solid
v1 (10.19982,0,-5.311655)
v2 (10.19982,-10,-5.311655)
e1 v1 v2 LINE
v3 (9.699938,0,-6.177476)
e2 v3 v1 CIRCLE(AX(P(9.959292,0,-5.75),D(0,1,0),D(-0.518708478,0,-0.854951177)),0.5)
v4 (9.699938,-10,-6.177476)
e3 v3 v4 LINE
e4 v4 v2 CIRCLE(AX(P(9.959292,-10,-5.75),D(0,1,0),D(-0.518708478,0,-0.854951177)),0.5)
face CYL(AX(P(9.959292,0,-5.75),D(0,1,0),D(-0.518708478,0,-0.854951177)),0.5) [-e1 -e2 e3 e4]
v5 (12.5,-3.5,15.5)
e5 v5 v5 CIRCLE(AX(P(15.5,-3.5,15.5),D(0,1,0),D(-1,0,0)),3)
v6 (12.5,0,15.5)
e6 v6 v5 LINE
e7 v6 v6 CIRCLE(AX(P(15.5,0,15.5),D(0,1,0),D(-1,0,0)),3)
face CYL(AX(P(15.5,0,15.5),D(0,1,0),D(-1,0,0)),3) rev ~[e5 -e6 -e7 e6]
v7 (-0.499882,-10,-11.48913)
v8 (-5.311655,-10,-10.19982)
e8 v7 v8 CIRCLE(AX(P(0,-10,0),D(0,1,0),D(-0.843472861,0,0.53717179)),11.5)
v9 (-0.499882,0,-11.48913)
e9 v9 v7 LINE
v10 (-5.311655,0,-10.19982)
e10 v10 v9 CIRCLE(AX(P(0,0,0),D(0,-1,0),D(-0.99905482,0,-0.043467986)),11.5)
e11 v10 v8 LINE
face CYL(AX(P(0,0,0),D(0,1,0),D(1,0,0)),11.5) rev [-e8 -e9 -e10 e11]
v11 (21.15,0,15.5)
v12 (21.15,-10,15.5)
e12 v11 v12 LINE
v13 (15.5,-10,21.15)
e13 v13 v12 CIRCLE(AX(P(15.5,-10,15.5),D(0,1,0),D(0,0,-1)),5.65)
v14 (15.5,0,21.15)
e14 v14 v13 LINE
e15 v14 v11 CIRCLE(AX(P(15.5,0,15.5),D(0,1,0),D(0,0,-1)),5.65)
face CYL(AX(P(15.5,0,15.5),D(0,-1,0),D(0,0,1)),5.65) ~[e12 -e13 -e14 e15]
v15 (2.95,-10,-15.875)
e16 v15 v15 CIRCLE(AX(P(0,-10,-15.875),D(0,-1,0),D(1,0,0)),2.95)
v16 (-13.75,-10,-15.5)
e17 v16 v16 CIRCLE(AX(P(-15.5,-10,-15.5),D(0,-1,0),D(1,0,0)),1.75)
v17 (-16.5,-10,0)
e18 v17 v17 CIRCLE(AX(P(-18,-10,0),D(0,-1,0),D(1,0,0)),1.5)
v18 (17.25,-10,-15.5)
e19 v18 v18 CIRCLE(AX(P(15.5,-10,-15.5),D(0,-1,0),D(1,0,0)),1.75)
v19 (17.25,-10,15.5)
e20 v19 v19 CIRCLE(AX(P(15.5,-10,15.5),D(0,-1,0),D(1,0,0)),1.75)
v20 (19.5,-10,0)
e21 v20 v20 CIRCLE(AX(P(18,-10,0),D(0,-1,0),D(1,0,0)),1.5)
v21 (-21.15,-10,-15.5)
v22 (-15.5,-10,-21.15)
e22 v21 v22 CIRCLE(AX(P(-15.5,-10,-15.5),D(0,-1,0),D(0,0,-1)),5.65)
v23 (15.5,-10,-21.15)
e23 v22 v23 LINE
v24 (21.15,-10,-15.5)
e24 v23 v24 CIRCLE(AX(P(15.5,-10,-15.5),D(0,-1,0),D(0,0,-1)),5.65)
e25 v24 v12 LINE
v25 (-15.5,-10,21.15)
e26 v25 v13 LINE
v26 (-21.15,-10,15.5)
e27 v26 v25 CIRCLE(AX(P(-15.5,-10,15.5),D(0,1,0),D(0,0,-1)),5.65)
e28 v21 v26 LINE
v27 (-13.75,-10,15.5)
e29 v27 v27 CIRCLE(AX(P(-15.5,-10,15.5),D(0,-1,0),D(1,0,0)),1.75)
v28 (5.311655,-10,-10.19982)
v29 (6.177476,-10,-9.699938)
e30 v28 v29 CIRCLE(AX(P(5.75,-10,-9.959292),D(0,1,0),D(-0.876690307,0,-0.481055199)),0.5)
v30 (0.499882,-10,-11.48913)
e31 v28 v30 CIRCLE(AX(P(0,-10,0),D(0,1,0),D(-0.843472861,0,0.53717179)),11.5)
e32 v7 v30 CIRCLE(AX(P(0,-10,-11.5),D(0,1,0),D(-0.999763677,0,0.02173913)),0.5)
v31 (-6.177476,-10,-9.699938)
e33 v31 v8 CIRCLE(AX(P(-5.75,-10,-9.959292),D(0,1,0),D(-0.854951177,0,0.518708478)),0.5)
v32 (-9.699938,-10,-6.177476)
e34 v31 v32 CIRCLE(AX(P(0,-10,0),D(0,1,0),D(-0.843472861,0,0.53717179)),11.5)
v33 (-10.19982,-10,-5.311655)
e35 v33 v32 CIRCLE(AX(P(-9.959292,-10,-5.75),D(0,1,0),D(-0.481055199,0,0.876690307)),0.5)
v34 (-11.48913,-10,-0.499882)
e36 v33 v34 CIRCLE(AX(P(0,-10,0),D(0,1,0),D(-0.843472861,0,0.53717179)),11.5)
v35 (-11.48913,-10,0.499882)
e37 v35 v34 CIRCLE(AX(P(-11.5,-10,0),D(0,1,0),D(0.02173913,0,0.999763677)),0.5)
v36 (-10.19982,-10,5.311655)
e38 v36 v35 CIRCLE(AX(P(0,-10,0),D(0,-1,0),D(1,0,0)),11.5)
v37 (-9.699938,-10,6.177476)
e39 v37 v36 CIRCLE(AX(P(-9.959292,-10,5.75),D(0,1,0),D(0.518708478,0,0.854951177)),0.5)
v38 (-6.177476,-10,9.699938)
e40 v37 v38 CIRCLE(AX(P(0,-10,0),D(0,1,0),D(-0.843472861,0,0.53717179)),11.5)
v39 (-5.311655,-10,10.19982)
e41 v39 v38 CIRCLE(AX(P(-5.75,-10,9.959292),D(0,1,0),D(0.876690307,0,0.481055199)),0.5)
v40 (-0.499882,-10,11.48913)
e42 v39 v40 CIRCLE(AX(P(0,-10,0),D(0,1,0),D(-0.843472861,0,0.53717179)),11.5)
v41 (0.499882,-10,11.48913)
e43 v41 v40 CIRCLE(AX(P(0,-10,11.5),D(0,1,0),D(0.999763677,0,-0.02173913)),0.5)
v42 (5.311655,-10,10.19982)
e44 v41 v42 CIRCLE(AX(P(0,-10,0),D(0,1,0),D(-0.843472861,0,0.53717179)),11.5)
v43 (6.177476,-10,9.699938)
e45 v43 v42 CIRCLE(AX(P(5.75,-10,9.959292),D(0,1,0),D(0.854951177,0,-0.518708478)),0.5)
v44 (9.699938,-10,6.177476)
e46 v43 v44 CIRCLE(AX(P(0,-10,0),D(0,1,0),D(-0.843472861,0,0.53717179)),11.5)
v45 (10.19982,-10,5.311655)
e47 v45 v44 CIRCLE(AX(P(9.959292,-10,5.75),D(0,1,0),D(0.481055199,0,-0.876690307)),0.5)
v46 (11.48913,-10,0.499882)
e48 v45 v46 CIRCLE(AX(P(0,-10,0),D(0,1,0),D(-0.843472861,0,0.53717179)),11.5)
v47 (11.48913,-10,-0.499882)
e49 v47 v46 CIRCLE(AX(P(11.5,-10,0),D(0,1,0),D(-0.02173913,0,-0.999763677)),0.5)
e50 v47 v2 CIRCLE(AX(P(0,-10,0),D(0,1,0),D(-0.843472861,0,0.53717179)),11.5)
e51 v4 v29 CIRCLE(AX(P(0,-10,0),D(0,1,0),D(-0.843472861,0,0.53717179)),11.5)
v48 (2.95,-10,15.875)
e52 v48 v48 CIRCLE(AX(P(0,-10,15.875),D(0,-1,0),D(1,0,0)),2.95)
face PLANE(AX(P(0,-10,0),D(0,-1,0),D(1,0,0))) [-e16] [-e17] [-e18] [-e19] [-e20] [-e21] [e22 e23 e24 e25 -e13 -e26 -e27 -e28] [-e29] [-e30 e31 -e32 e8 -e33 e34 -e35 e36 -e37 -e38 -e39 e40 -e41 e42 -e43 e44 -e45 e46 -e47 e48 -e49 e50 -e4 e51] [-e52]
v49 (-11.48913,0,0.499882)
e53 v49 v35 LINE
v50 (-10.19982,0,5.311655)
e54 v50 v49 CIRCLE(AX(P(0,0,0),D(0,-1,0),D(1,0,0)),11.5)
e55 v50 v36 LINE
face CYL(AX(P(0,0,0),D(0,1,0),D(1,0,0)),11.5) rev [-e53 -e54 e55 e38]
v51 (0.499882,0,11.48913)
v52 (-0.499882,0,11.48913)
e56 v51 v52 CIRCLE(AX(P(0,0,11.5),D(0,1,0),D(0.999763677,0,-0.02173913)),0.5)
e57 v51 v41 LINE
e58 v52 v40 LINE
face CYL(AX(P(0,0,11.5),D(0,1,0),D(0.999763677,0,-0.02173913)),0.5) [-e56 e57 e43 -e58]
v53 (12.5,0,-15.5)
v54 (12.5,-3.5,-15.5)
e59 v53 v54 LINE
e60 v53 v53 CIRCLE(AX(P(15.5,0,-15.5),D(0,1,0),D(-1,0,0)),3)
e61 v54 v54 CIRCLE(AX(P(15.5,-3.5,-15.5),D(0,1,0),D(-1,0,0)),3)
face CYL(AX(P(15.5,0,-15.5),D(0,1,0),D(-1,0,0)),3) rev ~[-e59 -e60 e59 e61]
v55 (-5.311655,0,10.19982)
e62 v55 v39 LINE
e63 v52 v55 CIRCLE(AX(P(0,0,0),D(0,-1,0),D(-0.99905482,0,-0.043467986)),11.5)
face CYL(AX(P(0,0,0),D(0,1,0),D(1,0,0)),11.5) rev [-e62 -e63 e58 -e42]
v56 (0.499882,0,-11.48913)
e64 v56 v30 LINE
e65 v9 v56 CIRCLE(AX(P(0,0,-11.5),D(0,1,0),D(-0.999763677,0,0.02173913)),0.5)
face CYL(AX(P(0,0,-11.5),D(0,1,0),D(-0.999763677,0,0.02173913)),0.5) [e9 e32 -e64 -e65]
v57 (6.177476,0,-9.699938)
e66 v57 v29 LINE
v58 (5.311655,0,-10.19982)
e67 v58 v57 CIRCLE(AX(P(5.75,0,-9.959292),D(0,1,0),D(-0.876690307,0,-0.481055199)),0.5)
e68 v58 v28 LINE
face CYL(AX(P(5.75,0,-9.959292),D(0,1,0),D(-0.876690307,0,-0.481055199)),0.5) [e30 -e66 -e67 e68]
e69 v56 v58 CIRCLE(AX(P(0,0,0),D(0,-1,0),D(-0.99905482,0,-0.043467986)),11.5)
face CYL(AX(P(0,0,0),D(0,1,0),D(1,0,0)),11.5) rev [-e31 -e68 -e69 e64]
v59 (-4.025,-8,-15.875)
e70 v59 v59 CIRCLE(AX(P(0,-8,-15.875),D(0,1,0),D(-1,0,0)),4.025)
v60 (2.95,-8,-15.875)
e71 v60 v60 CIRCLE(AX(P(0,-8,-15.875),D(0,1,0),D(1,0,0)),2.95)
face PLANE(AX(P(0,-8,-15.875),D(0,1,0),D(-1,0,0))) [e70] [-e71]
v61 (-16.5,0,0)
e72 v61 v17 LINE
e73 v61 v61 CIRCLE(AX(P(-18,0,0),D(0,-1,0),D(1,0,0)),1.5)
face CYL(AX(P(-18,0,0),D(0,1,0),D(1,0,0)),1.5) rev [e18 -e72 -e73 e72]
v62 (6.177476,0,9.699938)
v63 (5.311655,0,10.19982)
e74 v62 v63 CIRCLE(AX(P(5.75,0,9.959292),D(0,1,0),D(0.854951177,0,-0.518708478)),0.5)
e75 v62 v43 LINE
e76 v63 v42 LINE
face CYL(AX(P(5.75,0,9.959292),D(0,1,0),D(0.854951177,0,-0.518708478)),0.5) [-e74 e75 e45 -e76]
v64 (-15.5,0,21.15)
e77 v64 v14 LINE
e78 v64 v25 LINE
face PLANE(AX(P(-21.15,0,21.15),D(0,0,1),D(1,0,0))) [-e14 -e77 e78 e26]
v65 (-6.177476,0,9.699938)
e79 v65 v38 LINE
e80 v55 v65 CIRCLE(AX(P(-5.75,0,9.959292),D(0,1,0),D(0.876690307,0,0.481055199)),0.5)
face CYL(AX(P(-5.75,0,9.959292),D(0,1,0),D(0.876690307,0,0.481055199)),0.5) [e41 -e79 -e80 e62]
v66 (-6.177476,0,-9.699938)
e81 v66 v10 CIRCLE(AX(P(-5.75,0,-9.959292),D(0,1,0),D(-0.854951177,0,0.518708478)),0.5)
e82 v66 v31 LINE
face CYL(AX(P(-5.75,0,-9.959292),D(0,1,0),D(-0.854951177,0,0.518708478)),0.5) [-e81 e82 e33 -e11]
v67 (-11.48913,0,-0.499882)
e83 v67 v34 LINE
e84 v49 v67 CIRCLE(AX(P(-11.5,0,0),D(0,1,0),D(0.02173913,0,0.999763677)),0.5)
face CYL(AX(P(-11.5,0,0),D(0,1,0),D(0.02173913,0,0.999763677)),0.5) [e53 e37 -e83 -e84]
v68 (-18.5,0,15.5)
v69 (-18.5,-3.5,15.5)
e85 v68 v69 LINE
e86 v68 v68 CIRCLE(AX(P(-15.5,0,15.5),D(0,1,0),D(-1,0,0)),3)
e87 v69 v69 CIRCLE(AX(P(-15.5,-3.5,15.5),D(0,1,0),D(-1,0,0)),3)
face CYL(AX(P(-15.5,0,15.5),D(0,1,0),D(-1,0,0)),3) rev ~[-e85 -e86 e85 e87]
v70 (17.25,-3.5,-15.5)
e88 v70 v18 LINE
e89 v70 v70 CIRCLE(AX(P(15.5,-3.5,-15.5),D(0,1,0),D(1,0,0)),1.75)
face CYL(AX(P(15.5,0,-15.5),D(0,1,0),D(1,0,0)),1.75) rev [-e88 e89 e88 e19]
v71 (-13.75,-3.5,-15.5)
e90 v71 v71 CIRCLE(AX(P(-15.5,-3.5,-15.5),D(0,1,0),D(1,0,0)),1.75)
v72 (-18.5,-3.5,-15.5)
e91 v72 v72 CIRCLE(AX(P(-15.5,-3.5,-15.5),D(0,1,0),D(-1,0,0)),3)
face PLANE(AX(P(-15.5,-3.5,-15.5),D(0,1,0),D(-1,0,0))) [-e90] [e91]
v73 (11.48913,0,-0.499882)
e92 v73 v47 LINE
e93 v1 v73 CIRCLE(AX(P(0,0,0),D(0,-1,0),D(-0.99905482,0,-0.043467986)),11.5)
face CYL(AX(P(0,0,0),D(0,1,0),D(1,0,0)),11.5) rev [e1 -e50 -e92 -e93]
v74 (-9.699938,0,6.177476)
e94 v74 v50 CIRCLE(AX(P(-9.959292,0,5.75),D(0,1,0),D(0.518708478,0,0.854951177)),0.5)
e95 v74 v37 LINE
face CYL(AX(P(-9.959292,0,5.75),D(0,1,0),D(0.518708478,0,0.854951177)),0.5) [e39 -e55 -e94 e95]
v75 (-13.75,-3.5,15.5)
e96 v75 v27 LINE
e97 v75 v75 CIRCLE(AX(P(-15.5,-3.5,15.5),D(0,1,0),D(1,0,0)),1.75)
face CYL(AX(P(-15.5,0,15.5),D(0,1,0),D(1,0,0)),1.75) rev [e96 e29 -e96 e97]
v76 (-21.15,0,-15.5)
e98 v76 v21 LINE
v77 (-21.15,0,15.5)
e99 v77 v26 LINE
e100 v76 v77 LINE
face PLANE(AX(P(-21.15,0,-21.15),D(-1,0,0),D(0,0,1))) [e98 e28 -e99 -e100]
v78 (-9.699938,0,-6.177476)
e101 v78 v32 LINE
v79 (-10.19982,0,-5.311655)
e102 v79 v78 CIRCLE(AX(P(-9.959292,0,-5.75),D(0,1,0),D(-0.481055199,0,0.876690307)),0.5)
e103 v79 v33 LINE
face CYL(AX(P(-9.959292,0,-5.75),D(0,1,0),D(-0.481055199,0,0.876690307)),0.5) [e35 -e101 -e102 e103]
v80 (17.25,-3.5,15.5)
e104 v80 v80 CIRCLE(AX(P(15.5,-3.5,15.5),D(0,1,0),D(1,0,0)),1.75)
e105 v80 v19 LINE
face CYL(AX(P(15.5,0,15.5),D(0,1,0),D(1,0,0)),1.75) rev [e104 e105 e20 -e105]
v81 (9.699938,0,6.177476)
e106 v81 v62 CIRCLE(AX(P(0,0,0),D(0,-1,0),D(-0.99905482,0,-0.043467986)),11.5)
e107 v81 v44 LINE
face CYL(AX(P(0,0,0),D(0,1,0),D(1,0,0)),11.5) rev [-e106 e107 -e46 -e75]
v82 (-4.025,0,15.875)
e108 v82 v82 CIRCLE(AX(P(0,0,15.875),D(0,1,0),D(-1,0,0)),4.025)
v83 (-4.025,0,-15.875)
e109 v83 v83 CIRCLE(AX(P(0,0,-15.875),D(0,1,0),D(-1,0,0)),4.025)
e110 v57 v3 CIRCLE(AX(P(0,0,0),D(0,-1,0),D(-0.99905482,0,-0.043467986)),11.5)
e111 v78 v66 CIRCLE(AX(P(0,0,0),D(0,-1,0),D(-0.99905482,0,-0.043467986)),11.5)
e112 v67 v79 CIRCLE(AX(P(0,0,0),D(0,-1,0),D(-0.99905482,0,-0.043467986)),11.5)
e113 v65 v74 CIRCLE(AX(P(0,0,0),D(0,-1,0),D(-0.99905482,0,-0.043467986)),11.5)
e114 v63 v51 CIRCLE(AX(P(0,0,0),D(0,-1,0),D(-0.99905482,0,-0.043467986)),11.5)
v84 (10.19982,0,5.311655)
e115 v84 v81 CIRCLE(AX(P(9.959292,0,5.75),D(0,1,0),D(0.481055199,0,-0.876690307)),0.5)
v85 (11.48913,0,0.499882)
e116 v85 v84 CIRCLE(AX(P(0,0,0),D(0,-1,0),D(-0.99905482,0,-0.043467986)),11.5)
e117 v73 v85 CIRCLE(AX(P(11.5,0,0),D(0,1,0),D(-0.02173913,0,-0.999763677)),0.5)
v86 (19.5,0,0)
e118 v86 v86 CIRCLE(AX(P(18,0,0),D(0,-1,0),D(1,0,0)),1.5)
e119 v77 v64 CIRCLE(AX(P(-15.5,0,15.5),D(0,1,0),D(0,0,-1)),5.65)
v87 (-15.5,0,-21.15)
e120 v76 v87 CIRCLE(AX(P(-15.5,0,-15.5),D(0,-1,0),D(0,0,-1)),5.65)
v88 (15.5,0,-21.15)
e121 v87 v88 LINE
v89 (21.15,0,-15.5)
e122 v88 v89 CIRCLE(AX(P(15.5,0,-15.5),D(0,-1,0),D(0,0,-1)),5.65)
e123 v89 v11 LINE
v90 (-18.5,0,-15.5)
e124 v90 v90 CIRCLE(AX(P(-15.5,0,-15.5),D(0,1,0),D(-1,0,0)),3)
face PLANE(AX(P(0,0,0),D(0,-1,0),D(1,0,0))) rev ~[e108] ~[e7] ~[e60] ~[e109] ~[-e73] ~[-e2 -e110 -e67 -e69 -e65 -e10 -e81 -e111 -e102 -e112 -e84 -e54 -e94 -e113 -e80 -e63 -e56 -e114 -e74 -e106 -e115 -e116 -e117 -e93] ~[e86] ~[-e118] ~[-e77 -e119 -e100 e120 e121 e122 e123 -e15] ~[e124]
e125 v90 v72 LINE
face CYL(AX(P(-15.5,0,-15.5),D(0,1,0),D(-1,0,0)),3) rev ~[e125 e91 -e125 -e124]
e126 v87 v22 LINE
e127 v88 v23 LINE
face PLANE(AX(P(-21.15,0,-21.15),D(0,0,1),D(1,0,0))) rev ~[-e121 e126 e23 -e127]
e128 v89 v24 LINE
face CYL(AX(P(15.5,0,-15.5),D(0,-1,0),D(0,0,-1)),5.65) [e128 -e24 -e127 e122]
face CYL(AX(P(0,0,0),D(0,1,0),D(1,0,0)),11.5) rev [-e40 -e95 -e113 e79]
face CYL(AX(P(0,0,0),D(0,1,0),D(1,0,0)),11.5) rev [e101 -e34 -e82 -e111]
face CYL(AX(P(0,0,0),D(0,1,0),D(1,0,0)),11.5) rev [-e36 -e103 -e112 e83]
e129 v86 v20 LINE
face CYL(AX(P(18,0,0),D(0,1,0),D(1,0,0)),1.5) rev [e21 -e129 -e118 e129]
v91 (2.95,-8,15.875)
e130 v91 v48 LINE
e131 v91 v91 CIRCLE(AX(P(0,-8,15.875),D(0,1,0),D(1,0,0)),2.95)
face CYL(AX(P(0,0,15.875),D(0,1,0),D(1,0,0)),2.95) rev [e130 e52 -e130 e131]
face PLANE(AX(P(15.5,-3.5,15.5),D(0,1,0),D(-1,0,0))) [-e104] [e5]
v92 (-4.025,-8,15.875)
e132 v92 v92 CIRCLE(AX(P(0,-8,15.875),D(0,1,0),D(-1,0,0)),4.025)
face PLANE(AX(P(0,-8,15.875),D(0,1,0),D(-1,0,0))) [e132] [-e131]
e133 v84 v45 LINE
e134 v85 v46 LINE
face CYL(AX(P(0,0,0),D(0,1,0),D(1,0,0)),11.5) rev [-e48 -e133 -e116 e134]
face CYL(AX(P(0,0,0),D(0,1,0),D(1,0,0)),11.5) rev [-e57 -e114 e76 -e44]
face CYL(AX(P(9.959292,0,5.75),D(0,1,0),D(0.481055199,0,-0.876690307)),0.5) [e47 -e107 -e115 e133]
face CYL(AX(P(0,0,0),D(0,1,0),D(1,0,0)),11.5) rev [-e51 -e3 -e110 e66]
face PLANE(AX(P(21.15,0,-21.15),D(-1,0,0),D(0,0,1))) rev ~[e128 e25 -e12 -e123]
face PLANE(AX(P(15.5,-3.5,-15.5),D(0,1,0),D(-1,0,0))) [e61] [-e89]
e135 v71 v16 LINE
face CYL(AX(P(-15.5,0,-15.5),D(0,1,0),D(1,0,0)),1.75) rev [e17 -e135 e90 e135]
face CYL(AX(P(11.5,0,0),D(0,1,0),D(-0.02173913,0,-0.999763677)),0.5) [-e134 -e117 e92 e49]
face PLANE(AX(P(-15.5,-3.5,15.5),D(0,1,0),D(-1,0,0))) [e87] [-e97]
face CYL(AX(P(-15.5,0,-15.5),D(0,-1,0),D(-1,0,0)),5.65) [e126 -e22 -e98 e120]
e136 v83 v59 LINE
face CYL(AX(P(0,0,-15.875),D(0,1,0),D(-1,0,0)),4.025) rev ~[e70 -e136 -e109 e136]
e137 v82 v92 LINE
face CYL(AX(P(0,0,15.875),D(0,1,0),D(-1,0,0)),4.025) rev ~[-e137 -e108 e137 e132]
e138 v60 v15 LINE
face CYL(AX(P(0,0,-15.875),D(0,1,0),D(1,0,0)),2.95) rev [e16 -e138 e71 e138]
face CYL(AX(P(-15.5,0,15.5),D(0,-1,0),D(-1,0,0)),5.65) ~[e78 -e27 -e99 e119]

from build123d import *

# Parameters (mm, degrees)
F0_W            = 42.3
F0_H            = 42.3
F0_R            = 1.75
F0_R_2          = 2.95
F0_R_3          = 1.5
F0_R_4          = 11.5
F1_DEPTH        = 10
F2_R            = 3
F3_DEPTH        = 3.5
F4_R            = 4.025
F5_DEPTH        = 8
F6_R            = 5.65
F8_DEPTH        = 10
F8_COPIES_COUNT = 12


# Not quite as in the source:
# - a pattern or mirror of a feature is missing from the dataset's text; its kind, count and spacing are read off the source's solid


with BuildPart() as f1:
    # F0 (on Front) → F1 (new body)
    with BuildSketch(Plane.XZ):
        Rectangle(F0_W, F0_H)
        with Locations((-15.5, -15.5)):
            Circle(F0_R, mode=Mode.SUBTRACT)
        with Locations((0, -15.875)):
            Circle(F0_R_2, mode=Mode.SUBTRACT)
        with Locations((15.5, -15.5)):
            Circle(F0_R, mode=Mode.SUBTRACT)
        with Locations((-18, 0)):
            Circle(F0_R_3, mode=Mode.SUBTRACT)
        with Locations((-15.5, 15.5)):
            Circle(F0_R, mode=Mode.SUBTRACT)
        Circle(F0_R_4, mode=Mode.SUBTRACT)
        with Locations((18, 0)):
            Circle(F0_R_3, mode=Mode.SUBTRACT)
        with Locations((0, 15.875)):
            Circle(F0_R_2, mode=Mode.SUBTRACT)
        with Locations((15.5, 15.5)):
            Circle(F0_R, mode=Mode.SUBTRACT)
    extrude(amount=F1_DEPTH)

    # F2 (on face) → F3 (cut)
    with BuildSketch(Plane(origin=(0, 0, 0), x_dir=(-1, 0, 0), z_dir=(0, 1, 0))):
        with Locations((-15.5, 15.5)):
            Circle(F2_R)
        with Locations((15.5, 15.5)):
            Circle(F2_R)
        with Locations((15.5, -15.5)):
            Circle(F2_R)
        with Locations((-15.5, -15.5)):
            Circle(F2_R)
    extrude(amount=-F3_DEPTH, mode=Mode.SUBTRACT)

    # F4 (on face) → F5 (cut)
    with BuildSketch(Plane(origin=(0, 0, 0), x_dir=(-1, 0, 0), z_dir=(0, 1, 0))):
        with Locations((0, 15.875)):
            Circle(F4_R)
        with Locations((0, -15.875)):
            Circle(F4_R)
    extrude(amount=-F5_DEPTH, mode=Mode.SUBTRACT)

    # F6
    f6_edges = [f1.edges().sort_by_distance(p)[0] for p in [
        (21.15, -5, 21.15),
        (21.15, -5, -21.15),
        (-21.15, -5, 21.15),
        (-21.15, -5, -21.15),
    ]]
    fillet(f6_edges, radius=F6_R)

    # F7 (on face) → F8 (join)
    with BuildSketch(Plane(origin=(0, 0, 0), x_dir=(-1, 0, 0), z_dir=(0, 1, 0))):
        with BuildLine():
            ThreePointArc((11.4891304348, -0.4998818386), (11.5, 0), (11.4891304348, 0.4998818386))
            ThreePointArc((11.4891304348, 0.4998818386), (11, 0), (11.4891304348, -0.4998818386))
        make_face()
    f8 = extrude(amount=-F8_DEPTH)

    # F8_copies: F8 ×12 about axis
    f8_copies_axis = Axis((0, 0, 0), (0, 1, 0))
    for i in range(1, F8_COPIES_COUNT):
        add(f8.rotate(f8_copies_axis, i * 360 / F8_COPIES_COUNT))


solid = f1.part
